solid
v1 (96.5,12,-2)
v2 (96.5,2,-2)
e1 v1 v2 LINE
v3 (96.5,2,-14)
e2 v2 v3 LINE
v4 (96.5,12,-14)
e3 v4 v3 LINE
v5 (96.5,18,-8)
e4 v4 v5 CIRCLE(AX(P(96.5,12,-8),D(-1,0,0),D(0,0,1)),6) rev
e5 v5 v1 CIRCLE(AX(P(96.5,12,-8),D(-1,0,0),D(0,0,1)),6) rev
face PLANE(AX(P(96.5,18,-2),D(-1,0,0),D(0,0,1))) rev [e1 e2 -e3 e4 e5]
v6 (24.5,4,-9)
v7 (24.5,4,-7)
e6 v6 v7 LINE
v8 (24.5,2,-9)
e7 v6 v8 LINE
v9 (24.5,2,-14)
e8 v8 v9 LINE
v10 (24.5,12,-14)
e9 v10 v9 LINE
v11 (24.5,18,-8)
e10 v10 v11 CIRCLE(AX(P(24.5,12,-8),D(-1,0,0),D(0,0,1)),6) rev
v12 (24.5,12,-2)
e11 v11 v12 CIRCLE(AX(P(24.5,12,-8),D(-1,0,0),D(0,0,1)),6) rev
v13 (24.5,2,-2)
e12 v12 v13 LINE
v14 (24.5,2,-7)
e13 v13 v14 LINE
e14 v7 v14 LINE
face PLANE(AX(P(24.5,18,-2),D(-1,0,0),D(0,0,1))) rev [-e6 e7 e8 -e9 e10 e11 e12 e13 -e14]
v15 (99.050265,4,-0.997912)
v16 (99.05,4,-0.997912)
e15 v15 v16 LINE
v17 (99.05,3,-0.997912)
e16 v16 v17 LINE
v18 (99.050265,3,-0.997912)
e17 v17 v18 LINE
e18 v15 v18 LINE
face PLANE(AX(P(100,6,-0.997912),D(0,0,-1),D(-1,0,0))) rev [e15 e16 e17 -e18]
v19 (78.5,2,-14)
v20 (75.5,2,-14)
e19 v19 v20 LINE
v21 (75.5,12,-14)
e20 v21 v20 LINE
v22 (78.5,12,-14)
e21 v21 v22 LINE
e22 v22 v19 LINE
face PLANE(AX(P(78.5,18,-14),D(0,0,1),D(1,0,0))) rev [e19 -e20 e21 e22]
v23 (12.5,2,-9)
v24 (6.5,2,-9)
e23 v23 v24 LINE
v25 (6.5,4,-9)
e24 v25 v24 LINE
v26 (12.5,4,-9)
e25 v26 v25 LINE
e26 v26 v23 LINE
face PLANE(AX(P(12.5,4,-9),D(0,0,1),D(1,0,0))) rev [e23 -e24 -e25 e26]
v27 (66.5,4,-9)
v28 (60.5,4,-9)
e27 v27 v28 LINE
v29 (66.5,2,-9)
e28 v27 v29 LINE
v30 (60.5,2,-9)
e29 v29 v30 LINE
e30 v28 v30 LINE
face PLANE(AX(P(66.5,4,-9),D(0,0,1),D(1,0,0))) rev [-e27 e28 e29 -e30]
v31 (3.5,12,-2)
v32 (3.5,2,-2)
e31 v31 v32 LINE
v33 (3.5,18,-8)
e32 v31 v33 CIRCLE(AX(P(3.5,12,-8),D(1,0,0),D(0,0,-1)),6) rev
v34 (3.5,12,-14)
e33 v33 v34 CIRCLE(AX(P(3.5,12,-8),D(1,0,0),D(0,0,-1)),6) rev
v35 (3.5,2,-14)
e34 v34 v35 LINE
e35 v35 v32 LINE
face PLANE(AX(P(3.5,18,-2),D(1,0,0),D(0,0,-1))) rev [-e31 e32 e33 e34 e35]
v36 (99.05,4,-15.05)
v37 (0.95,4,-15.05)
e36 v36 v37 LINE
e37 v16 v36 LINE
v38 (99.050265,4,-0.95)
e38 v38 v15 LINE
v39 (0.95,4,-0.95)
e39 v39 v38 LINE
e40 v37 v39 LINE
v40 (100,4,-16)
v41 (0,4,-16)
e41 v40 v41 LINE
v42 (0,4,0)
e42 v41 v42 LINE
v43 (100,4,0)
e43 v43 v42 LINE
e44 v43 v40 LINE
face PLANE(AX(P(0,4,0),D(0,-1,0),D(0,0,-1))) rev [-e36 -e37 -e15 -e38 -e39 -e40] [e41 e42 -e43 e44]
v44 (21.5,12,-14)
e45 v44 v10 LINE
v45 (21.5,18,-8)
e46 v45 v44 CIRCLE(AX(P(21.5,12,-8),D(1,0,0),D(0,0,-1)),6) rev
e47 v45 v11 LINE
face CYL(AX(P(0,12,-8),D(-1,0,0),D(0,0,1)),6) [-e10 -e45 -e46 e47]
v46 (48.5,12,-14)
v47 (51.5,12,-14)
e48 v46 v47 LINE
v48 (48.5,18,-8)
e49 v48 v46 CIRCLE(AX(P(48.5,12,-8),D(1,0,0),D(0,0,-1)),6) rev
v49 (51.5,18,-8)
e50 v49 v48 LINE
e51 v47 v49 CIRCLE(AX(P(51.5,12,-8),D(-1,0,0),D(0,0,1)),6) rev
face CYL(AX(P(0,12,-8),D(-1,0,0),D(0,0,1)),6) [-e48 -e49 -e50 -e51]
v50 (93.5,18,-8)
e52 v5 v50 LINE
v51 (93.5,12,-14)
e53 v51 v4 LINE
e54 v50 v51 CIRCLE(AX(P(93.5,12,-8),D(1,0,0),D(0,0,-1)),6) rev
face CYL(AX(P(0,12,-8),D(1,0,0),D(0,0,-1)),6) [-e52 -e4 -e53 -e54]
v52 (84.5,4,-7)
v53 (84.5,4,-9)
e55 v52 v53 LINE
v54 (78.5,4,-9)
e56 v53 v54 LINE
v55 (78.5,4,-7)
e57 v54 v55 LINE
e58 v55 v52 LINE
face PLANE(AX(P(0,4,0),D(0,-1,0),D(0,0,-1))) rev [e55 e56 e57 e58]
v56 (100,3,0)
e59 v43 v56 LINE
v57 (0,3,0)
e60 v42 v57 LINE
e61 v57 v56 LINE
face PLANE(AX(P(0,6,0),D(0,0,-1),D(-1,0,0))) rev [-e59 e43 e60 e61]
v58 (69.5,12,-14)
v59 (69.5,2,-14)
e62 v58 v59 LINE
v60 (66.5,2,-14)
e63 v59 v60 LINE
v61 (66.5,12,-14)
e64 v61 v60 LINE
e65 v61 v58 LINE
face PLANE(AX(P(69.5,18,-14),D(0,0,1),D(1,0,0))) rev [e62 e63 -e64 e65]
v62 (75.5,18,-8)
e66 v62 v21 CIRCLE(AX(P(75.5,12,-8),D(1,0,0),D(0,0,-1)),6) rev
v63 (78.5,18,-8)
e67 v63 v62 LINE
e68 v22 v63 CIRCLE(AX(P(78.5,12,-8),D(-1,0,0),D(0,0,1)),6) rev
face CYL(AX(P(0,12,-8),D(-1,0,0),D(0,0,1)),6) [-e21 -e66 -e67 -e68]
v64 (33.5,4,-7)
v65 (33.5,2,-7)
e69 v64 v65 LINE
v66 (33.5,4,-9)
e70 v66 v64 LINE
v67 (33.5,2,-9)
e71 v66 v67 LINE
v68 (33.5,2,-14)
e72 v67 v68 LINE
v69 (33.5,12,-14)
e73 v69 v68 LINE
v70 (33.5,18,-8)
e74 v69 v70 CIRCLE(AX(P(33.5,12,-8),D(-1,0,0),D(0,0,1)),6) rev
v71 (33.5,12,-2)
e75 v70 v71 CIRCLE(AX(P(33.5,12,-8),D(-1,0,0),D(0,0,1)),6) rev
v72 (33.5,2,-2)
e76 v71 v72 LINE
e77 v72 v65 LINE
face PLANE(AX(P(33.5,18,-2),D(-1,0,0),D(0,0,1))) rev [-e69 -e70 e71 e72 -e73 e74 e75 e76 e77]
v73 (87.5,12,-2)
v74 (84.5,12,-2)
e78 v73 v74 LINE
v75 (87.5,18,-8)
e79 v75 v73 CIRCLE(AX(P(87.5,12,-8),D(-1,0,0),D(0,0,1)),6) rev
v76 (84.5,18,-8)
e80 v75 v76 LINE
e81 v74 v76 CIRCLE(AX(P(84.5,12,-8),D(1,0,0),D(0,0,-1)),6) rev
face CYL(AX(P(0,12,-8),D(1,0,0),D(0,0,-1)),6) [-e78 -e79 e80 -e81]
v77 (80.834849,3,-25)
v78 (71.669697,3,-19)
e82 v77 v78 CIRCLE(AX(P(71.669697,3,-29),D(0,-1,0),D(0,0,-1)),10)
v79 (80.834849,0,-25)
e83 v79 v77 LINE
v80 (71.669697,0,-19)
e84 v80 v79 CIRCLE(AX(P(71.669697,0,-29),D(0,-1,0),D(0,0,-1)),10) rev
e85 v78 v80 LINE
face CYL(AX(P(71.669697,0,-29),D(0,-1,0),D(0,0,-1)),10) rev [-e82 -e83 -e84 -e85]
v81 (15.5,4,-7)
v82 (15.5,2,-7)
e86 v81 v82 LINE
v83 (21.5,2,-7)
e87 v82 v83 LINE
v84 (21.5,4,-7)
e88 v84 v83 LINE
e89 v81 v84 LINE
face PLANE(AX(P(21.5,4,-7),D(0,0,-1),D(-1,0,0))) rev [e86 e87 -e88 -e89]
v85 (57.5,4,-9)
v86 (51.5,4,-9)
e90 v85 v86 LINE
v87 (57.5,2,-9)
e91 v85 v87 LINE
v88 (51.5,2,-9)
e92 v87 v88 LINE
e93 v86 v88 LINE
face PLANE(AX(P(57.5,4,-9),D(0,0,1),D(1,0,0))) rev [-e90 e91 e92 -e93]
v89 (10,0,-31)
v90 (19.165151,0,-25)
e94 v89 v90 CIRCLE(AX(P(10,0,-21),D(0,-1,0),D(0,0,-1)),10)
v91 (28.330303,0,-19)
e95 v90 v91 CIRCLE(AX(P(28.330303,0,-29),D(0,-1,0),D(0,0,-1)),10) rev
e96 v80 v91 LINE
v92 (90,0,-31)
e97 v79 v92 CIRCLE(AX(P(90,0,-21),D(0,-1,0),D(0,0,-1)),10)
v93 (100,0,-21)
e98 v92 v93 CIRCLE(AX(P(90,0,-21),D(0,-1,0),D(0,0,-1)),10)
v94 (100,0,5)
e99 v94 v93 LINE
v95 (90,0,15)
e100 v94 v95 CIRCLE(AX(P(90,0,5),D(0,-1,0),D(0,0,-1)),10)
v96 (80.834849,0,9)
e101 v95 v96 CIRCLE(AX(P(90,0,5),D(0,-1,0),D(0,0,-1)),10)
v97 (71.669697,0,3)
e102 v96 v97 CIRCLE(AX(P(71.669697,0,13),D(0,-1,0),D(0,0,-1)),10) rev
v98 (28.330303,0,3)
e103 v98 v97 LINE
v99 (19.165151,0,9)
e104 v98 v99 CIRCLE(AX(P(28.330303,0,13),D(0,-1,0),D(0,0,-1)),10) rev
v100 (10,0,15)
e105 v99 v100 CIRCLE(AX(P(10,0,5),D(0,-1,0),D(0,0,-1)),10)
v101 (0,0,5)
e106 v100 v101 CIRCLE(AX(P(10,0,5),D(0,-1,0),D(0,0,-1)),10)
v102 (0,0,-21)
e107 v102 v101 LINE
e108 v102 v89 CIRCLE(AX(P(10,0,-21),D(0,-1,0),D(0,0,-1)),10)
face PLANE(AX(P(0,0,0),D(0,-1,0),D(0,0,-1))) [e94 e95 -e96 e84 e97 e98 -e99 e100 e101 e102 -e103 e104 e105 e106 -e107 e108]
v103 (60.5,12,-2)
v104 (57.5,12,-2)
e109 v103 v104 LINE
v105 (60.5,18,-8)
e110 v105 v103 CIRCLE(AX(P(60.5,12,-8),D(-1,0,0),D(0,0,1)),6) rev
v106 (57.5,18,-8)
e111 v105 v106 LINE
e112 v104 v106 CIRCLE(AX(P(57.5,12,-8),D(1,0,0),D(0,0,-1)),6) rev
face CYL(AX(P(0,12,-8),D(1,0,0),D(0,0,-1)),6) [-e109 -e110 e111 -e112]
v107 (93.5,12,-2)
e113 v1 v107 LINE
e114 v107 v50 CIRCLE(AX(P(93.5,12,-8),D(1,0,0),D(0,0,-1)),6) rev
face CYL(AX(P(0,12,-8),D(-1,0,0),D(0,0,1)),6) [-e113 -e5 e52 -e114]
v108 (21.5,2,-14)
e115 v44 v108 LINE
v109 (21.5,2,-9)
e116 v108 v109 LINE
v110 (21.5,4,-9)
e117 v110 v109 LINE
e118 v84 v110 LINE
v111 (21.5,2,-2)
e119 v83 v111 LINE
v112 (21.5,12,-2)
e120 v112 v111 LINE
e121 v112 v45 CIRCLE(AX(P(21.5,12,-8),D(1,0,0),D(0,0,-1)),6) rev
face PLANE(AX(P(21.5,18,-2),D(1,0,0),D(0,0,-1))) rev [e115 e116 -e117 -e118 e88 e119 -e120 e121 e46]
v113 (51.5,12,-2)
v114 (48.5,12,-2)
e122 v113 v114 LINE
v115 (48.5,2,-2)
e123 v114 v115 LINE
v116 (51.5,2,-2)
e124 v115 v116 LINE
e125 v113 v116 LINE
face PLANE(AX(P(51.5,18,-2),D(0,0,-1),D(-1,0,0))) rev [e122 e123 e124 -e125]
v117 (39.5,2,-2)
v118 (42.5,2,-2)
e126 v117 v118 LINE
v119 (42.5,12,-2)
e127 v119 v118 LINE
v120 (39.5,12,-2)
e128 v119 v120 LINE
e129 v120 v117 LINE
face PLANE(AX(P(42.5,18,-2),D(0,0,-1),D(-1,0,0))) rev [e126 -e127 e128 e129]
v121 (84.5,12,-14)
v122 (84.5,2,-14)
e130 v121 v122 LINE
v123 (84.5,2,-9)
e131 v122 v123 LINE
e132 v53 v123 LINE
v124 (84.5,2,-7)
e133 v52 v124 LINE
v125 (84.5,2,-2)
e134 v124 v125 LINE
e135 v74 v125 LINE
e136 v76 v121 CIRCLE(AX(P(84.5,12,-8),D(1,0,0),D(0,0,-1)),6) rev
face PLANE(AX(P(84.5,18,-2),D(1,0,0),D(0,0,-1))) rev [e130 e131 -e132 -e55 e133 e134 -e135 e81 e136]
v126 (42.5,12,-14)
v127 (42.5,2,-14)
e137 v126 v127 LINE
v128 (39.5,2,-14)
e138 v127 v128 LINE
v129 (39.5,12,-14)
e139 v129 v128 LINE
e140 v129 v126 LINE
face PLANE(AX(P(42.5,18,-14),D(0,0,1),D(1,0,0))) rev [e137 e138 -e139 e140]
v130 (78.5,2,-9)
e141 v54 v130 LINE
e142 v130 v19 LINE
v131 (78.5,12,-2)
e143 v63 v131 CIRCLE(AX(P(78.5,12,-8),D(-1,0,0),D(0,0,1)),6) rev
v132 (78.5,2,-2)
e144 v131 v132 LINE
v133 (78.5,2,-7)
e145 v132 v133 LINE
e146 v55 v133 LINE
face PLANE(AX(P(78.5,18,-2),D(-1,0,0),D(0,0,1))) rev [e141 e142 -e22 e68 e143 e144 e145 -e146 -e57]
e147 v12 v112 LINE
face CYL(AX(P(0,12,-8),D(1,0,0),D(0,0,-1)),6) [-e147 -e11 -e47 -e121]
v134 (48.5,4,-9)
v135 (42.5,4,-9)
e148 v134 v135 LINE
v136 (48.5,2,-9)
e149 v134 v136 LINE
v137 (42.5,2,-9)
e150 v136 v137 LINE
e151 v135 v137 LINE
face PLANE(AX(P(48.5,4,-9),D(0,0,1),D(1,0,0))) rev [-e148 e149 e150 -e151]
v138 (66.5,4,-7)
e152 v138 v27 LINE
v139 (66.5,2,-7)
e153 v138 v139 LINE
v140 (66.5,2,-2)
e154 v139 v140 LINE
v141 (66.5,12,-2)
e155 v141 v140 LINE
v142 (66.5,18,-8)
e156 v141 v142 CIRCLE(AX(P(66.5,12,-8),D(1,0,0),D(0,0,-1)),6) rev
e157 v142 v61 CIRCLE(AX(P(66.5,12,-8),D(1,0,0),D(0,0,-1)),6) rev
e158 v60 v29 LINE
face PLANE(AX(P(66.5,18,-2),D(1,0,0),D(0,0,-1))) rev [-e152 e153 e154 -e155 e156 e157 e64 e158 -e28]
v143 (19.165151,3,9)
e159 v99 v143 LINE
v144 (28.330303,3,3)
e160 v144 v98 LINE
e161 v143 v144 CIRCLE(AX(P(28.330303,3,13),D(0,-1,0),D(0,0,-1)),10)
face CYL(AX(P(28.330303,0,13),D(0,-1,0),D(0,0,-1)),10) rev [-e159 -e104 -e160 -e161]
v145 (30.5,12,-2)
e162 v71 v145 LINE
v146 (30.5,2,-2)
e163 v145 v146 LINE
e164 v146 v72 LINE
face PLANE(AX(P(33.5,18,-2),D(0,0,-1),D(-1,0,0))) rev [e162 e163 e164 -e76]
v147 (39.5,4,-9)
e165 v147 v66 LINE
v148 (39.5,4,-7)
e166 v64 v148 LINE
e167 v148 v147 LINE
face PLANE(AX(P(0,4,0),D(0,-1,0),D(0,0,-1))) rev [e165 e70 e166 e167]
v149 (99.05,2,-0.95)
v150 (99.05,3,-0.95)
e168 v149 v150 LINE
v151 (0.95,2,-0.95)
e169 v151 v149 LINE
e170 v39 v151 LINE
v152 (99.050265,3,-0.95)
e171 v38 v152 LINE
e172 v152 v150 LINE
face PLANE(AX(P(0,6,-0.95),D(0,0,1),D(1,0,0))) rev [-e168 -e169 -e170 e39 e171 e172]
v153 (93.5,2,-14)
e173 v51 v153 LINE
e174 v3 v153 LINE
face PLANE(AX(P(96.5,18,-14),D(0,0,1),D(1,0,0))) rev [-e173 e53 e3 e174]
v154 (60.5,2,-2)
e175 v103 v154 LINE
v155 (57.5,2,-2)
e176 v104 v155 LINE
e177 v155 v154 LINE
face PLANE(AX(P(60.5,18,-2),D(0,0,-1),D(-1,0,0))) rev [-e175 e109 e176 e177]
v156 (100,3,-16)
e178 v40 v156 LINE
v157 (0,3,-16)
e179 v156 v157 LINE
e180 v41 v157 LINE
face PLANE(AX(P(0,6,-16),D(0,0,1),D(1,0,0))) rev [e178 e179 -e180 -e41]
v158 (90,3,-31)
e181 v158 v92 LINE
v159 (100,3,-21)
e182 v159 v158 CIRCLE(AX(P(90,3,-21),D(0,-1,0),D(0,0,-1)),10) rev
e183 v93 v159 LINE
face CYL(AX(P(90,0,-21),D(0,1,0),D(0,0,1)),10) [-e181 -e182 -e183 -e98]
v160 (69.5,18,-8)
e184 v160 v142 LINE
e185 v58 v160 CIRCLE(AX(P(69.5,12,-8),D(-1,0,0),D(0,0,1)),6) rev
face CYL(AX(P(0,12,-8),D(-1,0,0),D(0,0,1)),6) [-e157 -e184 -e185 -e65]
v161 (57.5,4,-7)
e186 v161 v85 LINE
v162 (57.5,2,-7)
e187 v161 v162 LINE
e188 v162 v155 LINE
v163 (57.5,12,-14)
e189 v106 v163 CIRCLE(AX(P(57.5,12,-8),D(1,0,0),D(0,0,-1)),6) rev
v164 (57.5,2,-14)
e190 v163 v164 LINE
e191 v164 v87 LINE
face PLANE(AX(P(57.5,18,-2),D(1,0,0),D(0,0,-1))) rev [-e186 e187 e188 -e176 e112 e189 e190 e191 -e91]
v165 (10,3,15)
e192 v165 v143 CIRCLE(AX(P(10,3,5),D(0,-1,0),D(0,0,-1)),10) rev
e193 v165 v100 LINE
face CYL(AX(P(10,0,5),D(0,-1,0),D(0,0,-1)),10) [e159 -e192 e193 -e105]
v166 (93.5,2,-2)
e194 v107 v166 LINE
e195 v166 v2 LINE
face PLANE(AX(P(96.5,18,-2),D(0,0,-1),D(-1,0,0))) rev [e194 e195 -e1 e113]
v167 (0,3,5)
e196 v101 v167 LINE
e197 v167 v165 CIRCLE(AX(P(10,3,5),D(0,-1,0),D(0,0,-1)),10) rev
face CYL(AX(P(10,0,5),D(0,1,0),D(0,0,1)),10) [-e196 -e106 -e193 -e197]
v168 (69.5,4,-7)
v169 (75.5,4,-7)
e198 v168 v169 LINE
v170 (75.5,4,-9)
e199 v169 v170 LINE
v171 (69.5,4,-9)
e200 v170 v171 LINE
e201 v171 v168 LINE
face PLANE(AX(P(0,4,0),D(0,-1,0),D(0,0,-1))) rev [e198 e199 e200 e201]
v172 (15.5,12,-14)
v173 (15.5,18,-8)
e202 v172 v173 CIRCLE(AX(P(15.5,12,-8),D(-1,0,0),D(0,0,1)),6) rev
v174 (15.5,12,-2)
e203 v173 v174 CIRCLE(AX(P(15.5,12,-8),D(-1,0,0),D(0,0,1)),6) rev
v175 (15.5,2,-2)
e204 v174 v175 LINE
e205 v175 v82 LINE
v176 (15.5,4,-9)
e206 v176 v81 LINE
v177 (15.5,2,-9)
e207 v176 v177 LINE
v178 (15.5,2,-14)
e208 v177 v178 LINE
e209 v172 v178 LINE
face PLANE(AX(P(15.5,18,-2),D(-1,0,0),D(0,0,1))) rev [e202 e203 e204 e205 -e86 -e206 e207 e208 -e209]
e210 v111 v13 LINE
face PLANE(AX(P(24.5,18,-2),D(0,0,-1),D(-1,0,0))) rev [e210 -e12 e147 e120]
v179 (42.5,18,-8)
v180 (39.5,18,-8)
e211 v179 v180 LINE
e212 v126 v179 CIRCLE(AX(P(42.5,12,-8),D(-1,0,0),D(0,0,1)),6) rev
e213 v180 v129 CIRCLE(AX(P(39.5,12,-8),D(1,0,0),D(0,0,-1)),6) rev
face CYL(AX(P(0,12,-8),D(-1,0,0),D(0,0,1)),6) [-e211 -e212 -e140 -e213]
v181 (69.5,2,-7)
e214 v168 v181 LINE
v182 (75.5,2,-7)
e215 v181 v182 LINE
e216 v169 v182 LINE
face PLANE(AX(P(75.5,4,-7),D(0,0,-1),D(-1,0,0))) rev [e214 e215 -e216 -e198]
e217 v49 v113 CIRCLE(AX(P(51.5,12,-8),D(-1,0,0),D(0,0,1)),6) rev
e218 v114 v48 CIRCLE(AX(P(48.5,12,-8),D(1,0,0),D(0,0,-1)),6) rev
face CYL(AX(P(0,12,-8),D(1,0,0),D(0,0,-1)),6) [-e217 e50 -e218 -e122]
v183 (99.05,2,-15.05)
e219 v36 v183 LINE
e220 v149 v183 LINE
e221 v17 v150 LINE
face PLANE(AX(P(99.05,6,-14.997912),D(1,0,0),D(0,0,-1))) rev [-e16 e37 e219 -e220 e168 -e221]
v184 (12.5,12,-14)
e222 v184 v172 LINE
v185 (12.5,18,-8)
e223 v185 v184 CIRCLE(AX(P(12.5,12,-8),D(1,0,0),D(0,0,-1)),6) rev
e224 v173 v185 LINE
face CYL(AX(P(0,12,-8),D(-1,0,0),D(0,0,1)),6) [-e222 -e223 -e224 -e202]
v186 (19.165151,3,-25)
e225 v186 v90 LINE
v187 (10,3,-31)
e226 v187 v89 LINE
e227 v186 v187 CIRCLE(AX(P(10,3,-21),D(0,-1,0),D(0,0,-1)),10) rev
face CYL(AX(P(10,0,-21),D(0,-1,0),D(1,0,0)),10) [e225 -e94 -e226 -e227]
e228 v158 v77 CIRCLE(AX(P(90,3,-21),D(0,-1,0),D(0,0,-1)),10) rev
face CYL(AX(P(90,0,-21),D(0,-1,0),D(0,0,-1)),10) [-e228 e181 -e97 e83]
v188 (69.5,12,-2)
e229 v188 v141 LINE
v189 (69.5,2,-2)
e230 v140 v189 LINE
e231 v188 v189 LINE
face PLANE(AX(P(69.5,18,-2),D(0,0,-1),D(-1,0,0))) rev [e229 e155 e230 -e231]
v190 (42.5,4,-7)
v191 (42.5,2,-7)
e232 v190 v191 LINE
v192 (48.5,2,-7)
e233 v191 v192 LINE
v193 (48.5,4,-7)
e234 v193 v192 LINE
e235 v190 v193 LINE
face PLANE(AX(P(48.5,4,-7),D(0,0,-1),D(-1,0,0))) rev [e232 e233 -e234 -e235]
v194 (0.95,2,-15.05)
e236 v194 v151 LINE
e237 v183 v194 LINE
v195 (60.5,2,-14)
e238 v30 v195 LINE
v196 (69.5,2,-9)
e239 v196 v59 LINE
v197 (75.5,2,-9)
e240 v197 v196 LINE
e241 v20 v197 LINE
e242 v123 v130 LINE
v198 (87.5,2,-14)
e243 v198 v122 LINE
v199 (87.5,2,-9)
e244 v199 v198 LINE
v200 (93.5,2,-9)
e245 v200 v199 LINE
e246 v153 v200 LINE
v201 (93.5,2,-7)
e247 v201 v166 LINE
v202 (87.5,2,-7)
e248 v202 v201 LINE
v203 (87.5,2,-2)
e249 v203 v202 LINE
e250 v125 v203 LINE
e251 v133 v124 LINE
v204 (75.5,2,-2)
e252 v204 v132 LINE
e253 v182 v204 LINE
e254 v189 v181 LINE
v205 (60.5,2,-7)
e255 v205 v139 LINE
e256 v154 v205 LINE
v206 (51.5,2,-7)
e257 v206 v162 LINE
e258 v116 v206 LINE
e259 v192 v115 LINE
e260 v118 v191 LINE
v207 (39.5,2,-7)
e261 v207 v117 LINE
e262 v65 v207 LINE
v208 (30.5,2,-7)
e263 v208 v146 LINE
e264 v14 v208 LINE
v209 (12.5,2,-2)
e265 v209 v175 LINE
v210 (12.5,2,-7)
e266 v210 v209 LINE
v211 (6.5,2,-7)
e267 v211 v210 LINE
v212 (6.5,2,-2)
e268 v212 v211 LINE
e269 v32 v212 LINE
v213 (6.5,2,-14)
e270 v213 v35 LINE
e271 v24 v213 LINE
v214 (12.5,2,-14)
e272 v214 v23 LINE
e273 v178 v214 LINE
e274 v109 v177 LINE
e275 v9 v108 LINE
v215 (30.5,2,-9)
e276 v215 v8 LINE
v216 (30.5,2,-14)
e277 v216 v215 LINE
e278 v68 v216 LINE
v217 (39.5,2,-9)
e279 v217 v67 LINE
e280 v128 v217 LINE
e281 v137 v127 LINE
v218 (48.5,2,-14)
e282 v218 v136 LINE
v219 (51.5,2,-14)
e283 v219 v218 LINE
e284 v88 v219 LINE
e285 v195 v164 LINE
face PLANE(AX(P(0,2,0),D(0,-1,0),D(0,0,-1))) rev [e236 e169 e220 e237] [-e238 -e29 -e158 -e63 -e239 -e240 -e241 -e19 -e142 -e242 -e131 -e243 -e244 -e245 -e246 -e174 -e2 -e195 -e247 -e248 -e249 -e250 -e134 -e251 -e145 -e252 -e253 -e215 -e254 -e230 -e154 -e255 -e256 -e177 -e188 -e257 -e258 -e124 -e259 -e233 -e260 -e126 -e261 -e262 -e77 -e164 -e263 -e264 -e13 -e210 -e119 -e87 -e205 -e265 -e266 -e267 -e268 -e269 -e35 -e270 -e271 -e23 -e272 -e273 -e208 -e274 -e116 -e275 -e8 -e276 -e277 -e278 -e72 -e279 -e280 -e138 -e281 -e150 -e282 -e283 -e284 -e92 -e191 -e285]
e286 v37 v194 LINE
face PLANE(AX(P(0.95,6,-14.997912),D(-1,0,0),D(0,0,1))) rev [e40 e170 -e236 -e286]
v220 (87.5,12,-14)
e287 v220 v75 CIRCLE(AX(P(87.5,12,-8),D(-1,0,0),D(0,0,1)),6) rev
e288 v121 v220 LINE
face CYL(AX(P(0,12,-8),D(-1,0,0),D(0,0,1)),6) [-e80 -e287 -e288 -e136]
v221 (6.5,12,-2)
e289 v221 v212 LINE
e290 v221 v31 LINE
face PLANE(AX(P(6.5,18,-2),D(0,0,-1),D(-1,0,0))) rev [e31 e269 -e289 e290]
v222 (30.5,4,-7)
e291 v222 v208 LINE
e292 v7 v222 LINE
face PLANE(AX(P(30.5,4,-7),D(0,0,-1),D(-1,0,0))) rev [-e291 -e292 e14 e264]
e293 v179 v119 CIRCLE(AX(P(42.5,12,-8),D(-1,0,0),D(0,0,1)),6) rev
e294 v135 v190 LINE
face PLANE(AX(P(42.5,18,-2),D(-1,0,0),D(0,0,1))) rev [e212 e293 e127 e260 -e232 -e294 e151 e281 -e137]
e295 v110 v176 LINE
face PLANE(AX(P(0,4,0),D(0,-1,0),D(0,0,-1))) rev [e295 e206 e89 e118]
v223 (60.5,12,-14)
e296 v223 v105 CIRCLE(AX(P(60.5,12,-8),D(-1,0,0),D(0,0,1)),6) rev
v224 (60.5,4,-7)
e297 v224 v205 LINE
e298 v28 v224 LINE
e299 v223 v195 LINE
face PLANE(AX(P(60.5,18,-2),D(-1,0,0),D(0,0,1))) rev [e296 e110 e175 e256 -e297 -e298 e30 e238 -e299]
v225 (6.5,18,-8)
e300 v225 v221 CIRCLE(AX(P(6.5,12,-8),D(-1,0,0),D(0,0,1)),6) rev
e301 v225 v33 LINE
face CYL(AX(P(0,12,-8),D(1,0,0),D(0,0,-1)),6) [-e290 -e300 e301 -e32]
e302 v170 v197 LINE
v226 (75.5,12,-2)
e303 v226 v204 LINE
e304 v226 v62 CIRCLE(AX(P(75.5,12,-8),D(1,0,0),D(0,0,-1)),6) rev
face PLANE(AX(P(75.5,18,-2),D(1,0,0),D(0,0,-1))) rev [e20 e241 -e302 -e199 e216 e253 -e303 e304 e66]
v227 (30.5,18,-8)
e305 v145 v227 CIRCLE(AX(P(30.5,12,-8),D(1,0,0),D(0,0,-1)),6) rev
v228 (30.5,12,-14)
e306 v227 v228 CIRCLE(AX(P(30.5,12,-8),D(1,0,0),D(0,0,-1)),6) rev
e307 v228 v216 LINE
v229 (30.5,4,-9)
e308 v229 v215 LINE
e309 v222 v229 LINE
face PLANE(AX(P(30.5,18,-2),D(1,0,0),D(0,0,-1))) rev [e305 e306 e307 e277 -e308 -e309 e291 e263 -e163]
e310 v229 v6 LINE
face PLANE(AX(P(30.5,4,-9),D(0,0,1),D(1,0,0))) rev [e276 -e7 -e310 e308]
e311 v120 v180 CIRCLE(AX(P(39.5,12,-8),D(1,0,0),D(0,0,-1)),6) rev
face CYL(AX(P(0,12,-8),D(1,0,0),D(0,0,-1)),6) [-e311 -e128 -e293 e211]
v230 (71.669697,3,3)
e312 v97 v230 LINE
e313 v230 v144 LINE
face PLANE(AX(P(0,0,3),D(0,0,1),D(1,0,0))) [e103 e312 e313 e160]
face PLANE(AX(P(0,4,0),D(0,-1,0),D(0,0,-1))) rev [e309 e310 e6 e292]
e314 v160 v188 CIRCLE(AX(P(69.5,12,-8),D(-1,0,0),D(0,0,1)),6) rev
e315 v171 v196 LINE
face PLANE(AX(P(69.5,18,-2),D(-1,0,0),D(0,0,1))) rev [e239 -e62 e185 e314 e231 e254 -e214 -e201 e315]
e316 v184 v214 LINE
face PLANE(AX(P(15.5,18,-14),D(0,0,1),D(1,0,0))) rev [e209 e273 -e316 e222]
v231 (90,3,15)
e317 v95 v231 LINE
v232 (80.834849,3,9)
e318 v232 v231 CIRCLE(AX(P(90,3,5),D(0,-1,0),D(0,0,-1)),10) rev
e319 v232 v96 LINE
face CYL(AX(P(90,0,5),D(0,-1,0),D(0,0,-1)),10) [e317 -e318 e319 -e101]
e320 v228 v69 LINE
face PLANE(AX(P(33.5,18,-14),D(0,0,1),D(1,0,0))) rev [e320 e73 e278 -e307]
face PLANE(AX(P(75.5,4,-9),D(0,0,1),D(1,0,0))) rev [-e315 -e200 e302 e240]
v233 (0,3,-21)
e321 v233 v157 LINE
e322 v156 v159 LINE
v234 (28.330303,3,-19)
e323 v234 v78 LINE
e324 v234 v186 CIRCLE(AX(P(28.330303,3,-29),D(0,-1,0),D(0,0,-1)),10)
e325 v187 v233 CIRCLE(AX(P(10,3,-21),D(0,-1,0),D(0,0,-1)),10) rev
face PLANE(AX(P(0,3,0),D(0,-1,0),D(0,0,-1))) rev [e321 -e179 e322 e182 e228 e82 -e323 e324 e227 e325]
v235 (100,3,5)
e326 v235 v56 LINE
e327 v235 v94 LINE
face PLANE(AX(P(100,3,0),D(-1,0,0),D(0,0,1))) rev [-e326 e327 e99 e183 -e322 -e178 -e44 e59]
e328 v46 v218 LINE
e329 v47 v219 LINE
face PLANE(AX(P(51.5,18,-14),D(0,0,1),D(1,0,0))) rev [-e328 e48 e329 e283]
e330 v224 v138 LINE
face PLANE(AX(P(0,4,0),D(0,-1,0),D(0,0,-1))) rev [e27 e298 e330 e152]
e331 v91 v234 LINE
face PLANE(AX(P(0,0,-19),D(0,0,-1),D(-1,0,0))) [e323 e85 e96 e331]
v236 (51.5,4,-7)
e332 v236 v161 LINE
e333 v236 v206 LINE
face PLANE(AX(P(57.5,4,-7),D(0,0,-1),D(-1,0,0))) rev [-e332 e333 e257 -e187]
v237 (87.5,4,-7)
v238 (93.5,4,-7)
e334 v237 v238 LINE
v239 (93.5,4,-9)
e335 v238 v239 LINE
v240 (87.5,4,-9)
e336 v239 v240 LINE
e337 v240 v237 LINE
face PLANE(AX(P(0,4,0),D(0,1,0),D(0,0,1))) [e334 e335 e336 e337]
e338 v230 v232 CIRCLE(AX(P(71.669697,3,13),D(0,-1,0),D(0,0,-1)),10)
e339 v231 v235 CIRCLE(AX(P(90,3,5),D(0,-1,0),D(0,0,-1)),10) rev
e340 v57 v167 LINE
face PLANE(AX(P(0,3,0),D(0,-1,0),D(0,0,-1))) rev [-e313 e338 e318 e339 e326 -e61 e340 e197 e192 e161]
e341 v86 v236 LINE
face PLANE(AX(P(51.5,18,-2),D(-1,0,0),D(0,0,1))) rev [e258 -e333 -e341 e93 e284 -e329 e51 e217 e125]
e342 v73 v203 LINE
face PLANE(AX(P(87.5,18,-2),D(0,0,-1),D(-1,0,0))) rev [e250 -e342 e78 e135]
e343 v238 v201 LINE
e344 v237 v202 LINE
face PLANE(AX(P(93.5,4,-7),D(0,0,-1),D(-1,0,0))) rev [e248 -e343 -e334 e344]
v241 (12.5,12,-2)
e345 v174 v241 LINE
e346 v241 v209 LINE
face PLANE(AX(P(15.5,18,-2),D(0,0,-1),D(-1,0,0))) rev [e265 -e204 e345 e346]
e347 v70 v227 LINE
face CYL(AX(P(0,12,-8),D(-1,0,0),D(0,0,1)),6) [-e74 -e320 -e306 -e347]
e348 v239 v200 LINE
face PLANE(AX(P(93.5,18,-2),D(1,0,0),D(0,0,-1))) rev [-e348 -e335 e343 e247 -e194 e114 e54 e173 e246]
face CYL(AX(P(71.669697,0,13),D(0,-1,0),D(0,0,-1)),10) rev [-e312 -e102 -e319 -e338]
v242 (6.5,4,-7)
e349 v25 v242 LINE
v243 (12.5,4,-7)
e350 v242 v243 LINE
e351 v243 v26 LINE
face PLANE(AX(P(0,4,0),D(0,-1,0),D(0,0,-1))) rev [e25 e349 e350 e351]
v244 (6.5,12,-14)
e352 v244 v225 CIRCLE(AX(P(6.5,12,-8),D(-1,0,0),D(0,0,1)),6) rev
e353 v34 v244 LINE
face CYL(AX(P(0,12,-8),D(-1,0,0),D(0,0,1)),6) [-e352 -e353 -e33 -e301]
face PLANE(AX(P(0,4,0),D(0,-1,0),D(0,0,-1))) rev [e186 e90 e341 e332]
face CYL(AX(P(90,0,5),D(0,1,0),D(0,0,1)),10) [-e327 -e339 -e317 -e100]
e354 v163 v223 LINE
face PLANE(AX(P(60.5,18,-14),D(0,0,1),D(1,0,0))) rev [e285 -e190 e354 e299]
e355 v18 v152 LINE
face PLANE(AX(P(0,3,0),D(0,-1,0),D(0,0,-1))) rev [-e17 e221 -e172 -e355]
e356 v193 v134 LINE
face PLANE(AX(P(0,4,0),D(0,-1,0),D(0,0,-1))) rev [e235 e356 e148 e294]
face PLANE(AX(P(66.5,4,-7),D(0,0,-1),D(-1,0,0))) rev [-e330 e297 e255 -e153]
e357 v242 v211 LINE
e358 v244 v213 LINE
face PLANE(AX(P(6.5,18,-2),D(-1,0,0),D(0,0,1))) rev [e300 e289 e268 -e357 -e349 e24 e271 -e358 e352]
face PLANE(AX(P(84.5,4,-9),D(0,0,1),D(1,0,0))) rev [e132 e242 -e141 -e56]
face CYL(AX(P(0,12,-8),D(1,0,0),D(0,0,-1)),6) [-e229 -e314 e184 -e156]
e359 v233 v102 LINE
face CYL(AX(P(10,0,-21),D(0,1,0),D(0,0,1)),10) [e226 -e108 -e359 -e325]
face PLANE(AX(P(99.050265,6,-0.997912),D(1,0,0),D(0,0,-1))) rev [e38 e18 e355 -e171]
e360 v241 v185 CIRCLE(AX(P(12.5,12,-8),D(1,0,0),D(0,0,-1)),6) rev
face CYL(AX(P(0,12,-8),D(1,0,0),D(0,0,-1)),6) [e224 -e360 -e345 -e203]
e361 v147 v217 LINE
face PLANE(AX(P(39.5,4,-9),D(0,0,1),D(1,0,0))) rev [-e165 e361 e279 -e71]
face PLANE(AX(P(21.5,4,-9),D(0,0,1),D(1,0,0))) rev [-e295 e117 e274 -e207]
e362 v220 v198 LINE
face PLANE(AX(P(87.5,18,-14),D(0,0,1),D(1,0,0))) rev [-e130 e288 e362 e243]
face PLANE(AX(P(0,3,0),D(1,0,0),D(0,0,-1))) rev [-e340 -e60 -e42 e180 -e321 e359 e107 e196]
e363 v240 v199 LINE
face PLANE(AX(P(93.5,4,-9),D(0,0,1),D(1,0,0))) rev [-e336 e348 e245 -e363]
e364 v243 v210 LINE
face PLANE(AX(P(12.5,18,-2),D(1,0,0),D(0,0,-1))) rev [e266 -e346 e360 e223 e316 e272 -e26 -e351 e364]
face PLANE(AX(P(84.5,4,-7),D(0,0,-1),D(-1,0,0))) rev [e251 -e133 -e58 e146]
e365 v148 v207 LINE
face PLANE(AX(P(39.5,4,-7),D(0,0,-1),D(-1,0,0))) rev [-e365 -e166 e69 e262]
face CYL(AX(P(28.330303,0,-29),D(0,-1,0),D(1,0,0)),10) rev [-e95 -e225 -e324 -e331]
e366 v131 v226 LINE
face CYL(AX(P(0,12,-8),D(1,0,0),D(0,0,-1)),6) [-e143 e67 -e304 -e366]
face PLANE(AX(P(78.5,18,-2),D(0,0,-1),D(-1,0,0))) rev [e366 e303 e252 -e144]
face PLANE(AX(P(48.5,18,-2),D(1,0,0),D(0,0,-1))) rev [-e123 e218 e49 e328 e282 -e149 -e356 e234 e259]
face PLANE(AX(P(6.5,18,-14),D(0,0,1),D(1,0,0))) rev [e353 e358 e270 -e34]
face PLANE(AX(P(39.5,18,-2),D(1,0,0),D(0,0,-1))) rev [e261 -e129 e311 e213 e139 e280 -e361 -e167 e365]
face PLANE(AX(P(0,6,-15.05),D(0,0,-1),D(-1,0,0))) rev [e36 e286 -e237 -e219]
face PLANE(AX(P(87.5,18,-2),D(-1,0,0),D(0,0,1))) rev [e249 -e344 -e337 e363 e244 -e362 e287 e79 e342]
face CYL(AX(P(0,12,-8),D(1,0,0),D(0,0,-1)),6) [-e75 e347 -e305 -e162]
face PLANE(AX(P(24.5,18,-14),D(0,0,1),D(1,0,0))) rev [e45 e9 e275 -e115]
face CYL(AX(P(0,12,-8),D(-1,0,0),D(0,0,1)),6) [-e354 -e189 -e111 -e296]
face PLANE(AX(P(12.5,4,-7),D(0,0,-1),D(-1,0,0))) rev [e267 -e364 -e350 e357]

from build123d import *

# Parameters (mm, degrees)
SKETCH1_W            = 100
SKETCH1_H            = 16
BOSS_EXTRUDE1_DEPTH  = 3
SKETCH2_W            = 98
SKETCH2_H            = 14
CUT_EXTRUDE1_DEPTH   = 1
SKETCH5_W            = 20
SKETCH5_H            = 3
BOSS_EXTRUDE4_DEPTH  = 15
SKETCH6_W            = 20
SKETCH6_H            = 3
BOSS_EXTRUDE5_DEPTH  = 15
FILLET18_R           = 10
SKETCH7_W            = 3
SKETCH7_H            = 12
BOSS_EXTRUDE6_DEPTH  = 16
SKETCH8_W            = 6
SKETCH8_H            = 2
BOSS_EXTRUDE7_DEPTH  = 2
FILLET19_R           = 6
SKETCH10_W           = 60
SKETCH10_H           = 3
BOSS_EXTRUDE8_DEPTH  = 3
SKETCH11_W           = 60
SKETCH11_H           = 3
BOSS_EXTRUDE9_DEPTH  = 3
SKETCH12_W           = 0.95
SKETCH12_H           = 14
BOSS_EXTRUDE10_DEPTH = 3
SKETCH13_W           = 100
SKETCH13_H           = 0.95
BOSS_EXTRUDE11_DEPTH = 3
SKETCH14_W           = 0.95
SKETCH14_H           = 0.052088128
BOSS_EXTRUDE12_DEPTH = 3
SKETCH15_W           = 0.95
SKETCH15_H           = 0.047911872
SKETCH15_W_2         = 0.949734752
SKETCH15_H_2         = 0.052088128
BOSS_EXTRUDE13_DEPTH = 3
FILLET20_R           = 10
SKETCH17_W           = 98.1
SKETCH17_H           = 14.1
SKETCH17_W_2         = 97.1
SKETCH17_H_2         = 13.1
CUT_EXTRUDE2_DEPTH   = 4
SKETCH18_W           = 100
SKETCH18_H           = 16.05
SKETCH18_W_2         = 98
SKETCH18_H_2         = 14.05
CUT_EXTRUDE3_DEPTH   = 2


with BuildPart() as part:
    # Sketch1 → Boss-Extrude1 (new body)
    with BuildSketch(Plane(origin=(0, 0, 0), x_dir=(1, 0, 0), z_dir=(0, 1, 0))):
        with Locations((50, 8)):
            Rectangle(SKETCH1_W, SKETCH1_H)
    extrude(amount=BOSS_EXTRUDE1_DEPTH)

    # Sketch2 → Cut-Extrude1 (cut)
    with BuildSketch(Plane(origin=(0, 3, 0), x_dir=(1, 0, 0), z_dir=(0, 1, 0))):
        with Locations((50, 8)):
            Rectangle(SKETCH2_W, SKETCH2_H)
    extrude(amount=-CUT_EXTRUDE1_DEPTH, mode=Mode.SUBTRACT)

    # Sketch5 → Boss-Extrude4 (add)
    with BuildSketch(Plane.XY):
        with Locations((10, 1.5)):
            Rectangle(SKETCH5_W, SKETCH5_H)
        with Locations((90, 1.5)):
            Rectangle(SKETCH5_W, SKETCH5_H)
    extrude(amount=BOSS_EXTRUDE4_DEPTH)

    # Sketch6 → Boss-Extrude5 (add)
    with BuildSketch(Plane(origin=(0, 0, -16), x_dir=(-1, 0, 0), z_dir=(0, 0, -1))):
        with Locations((-90, 1.5)):
            Rectangle(SKETCH6_W, SKETCH6_H)
        with Locations((-10, 1.5)):
            Rectangle(SKETCH6_W, SKETCH6_H)
    extrude(amount=BOSS_EXTRUDE5_DEPTH)

    # Fillet18
    fillet18_edges = [part.edges().sort_by_distance(p)[0] for p in [
        (20, 1.5, 15),
        (0, 1.5, 15),
        (80, 1.5, 15),
        (100, 1.5, 15),
        (0, 1.5, -31),
        (20, 1.5, -31),
        (80, 1.5, -31),
        (100, 1.5, -31),
    ]]
    fillet(fillet18_edges, radius=FILLET18_R - 0.0001)  # a hair under: the kernel refuses the full size

    # Sketch7 → Boss-Extrude6 (add)
    with BuildSketch(Plane(origin=(0, 2, 0), x_dir=(1, 0, 0), z_dir=(0, 1, 0))):
        with Locations((95, 8)):
            Rectangle(SKETCH7_W, SKETCH7_H)
        with Locations((86, 8)):
            Rectangle(SKETCH7_W, SKETCH7_H)
        with Locations((77, 8)):
            Rectangle(SKETCH7_W, SKETCH7_H)
        with Locations((68, 8)):
            Rectangle(SKETCH7_W, SKETCH7_H)
        with Locations((59, 8)):
            Rectangle(SKETCH7_W, SKETCH7_H)
        with Locations((50, 8)):
            Rectangle(SKETCH7_W, SKETCH7_H)
        with Locations((41, 8)):
            Rectangle(SKETCH7_W, SKETCH7_H)
        with Locations((32, 8)):
            Rectangle(SKETCH7_W, SKETCH7_H)
        with Locations((23, 8)):
            Rectangle(SKETCH7_W, SKETCH7_H)
        with Locations((14, 8)):
            Rectangle(SKETCH7_W, SKETCH7_H)
        with Locations((5, 8)):
            Rectangle(SKETCH7_W, SKETCH7_H)
    extrude(amount=BOSS_EXTRUDE6_DEPTH)

    # Sketch8 → Boss-Extrude7 (add)
    with BuildSketch(Plane(origin=(0, 2, 0), x_dir=(1, 0, 0), z_dir=(0, 1, 0))):
        with Locations((90.5, 8)):
            Rectangle(SKETCH8_W, SKETCH8_H)
        with Locations((81.5, 8)):
            Rectangle(SKETCH8_W, SKETCH8_H)
        with Locations((72.5, 8)):
            Rectangle(SKETCH8_W, SKETCH8_H)
        with Locations((63.5, 8)):
            Rectangle(SKETCH8_W, SKETCH8_H)
        with Locations((54.5, 8)):
            Rectangle(SKETCH8_W, SKETCH8_H)
        with Locations((45.5, 8)):
            Rectangle(SKETCH8_W, SKETCH8_H)
        with Locations((36.5, 8)):
            Rectangle(SKETCH8_W, SKETCH8_H)
        with Locations((27.5, 8)):
            Rectangle(SKETCH8_W, SKETCH8_H)
        with Locations((18.5, 8)):
            Rectangle(SKETCH8_W, SKETCH8_H)
        with Locations((9.5, 8)):
            Rectangle(SKETCH8_W, SKETCH8_H)
    extrude(amount=BOSS_EXTRUDE7_DEPTH)

    # Fillet19
    fillet19_edges = [part.edges().sort_by_distance(p)[0] for p in [
        (95, 18, -2),
        (95, 18, -14),
        (86, 18, -2),
        (86, 18, -14),
        (77, 18, -2),
        (77, 18, -14),
        (68, 18, -2),
        (68, 18, -14),
        (59, 18, -2),
        (59, 18, -14),
        (50, 18, -2),
        (50, 18, -14),
        (41, 18, -2),
        (41, 18, -14),
        (32, 18, -2),
        (32, 18, -14),
        (23, 18, -14),
        (23, 18, -2),
        (14, 18, -2),
        (14, 18, -14),
        (5, 18, -2),
        (5, 18, -14),
    ]]
    fillet(fillet19_edges, radius=FILLET19_R - 0.0001)  # a hair under: the kernel refuses the full size

    # Sketch10 → Boss-Extrude8 (add)
    with BuildSketch(Plane(origin=(0, 0, -16), x_dir=(-1, 0, 0), z_dir=(0, 0, -1))):
        with Locations((-50, 1.5)):
            Rectangle(SKETCH10_W, SKETCH10_H)
    extrude(amount=BOSS_EXTRUDE8_DEPTH)

    # Sketch11 → Boss-Extrude9 (add)
    with BuildSketch(Plane.XY):
        with Locations((50, 1.5)):
            Rectangle(SKETCH11_W, SKETCH11_H)
    extrude(amount=BOSS_EXTRUDE9_DEPTH)

    # Sketch12 → Boss-Extrude10 (add)
    with BuildSketch(Plane(origin=(0, 3, 0), x_dir=(1, 0, 0), z_dir=(0, 1, 0))):
        with Locations((99.525, 7.997911872)):
            Rectangle(SKETCH12_W, SKETCH12_H)
        with Locations((0.475, 7.997911872)):
            Rectangle(SKETCH12_W, SKETCH12_H)
    extrude(amount=BOSS_EXTRUDE10_DEPTH)

    # Sketch13 → Boss-Extrude11 (add)
    with BuildSketch(Plane(origin=(0, 3, 0), x_dir=(1, 0, 0), z_dir=(0, 1, 0))):
        with Locations((50, 15.525)):
            Rectangle(SKETCH13_W, SKETCH13_H)
        with Locations((50, 0.475)):
            Rectangle(SKETCH13_W, SKETCH13_H)
    extrude(amount=BOSS_EXTRUDE11_DEPTH)

    # Sketch14 → Boss-Extrude12 (add)
    with BuildSketch(Plane(origin=(0, 3, 0), x_dir=(1, 0, 0), z_dir=(0, 1, 0))):
        with Locations((0.475, 15.023955936)):
            Rectangle(SKETCH14_W, SKETCH14_H)
    extrude(amount=BOSS_EXTRUDE12_DEPTH)

    # Sketch15 → Boss-Extrude13 (add)
    with BuildSketch(Plane(origin=(0, 3, 0), x_dir=(1, 0, 0), z_dir=(0, 1, 0))):
        with Locations((0.475, 0.973955936)):
            Rectangle(SKETCH15_W, SKETCH15_H)
        with Locations((99.525132624, 0.973955936)):
            Rectangle(SKETCH15_W_2, SKETCH15_H)
        with Locations((99.525, 15.023955936)):
            Rectangle(SKETCH15_W, SKETCH15_H_2)
    extrude(amount=BOSS_EXTRUDE13_DEPTH)

    # Fillet20
    fillet20_edges = [part.edges().sort_by_distance(p)[0] for p in [
        (20, 1.5, -19),
        (80, 1.5, -19),
        (80, 1.5, 3),
        (20, 1.5, 3),
    ]]
    fillet(fillet20_edges, radius=FILLET20_R)

    # Sketch17 → Cut-Extrude2 (cut)
    with BuildSketch(Plane(origin=(0, 6, 0), x_dir=(1, 0, 0), z_dir=(0, 1, 0))):
        with Locations((50, 8)):
            Rectangle(SKETCH17_W, SKETCH17_H)
        with Locations((50, 8)):
            Rectangle(SKETCH17_W_2, SKETCH17_H_2, mode=Mode.SUBTRACT)
    extrude(amount=-CUT_EXTRUDE2_DEPTH, mode=Mode.SUBTRACT)

    # Sketch18 → Cut-Extrude3 (cut)
    with BuildSketch(Plane(origin=(0, 6, 0), x_dir=(1, 0, 0), z_dir=(0, 1, 0))):
        with Locations((50, 7.975)):
            Rectangle(SKETCH18_W, SKETCH18_H)
        with Locations((50, 7.975)):
            Rectangle(SKETCH18_W_2, SKETCH18_H_2, mode=Mode.SUBTRACT)
    extrude(amount=-CUT_EXTRUDE3_DEPTH, mode=Mode.SUBTRACT)


solid = part.part
